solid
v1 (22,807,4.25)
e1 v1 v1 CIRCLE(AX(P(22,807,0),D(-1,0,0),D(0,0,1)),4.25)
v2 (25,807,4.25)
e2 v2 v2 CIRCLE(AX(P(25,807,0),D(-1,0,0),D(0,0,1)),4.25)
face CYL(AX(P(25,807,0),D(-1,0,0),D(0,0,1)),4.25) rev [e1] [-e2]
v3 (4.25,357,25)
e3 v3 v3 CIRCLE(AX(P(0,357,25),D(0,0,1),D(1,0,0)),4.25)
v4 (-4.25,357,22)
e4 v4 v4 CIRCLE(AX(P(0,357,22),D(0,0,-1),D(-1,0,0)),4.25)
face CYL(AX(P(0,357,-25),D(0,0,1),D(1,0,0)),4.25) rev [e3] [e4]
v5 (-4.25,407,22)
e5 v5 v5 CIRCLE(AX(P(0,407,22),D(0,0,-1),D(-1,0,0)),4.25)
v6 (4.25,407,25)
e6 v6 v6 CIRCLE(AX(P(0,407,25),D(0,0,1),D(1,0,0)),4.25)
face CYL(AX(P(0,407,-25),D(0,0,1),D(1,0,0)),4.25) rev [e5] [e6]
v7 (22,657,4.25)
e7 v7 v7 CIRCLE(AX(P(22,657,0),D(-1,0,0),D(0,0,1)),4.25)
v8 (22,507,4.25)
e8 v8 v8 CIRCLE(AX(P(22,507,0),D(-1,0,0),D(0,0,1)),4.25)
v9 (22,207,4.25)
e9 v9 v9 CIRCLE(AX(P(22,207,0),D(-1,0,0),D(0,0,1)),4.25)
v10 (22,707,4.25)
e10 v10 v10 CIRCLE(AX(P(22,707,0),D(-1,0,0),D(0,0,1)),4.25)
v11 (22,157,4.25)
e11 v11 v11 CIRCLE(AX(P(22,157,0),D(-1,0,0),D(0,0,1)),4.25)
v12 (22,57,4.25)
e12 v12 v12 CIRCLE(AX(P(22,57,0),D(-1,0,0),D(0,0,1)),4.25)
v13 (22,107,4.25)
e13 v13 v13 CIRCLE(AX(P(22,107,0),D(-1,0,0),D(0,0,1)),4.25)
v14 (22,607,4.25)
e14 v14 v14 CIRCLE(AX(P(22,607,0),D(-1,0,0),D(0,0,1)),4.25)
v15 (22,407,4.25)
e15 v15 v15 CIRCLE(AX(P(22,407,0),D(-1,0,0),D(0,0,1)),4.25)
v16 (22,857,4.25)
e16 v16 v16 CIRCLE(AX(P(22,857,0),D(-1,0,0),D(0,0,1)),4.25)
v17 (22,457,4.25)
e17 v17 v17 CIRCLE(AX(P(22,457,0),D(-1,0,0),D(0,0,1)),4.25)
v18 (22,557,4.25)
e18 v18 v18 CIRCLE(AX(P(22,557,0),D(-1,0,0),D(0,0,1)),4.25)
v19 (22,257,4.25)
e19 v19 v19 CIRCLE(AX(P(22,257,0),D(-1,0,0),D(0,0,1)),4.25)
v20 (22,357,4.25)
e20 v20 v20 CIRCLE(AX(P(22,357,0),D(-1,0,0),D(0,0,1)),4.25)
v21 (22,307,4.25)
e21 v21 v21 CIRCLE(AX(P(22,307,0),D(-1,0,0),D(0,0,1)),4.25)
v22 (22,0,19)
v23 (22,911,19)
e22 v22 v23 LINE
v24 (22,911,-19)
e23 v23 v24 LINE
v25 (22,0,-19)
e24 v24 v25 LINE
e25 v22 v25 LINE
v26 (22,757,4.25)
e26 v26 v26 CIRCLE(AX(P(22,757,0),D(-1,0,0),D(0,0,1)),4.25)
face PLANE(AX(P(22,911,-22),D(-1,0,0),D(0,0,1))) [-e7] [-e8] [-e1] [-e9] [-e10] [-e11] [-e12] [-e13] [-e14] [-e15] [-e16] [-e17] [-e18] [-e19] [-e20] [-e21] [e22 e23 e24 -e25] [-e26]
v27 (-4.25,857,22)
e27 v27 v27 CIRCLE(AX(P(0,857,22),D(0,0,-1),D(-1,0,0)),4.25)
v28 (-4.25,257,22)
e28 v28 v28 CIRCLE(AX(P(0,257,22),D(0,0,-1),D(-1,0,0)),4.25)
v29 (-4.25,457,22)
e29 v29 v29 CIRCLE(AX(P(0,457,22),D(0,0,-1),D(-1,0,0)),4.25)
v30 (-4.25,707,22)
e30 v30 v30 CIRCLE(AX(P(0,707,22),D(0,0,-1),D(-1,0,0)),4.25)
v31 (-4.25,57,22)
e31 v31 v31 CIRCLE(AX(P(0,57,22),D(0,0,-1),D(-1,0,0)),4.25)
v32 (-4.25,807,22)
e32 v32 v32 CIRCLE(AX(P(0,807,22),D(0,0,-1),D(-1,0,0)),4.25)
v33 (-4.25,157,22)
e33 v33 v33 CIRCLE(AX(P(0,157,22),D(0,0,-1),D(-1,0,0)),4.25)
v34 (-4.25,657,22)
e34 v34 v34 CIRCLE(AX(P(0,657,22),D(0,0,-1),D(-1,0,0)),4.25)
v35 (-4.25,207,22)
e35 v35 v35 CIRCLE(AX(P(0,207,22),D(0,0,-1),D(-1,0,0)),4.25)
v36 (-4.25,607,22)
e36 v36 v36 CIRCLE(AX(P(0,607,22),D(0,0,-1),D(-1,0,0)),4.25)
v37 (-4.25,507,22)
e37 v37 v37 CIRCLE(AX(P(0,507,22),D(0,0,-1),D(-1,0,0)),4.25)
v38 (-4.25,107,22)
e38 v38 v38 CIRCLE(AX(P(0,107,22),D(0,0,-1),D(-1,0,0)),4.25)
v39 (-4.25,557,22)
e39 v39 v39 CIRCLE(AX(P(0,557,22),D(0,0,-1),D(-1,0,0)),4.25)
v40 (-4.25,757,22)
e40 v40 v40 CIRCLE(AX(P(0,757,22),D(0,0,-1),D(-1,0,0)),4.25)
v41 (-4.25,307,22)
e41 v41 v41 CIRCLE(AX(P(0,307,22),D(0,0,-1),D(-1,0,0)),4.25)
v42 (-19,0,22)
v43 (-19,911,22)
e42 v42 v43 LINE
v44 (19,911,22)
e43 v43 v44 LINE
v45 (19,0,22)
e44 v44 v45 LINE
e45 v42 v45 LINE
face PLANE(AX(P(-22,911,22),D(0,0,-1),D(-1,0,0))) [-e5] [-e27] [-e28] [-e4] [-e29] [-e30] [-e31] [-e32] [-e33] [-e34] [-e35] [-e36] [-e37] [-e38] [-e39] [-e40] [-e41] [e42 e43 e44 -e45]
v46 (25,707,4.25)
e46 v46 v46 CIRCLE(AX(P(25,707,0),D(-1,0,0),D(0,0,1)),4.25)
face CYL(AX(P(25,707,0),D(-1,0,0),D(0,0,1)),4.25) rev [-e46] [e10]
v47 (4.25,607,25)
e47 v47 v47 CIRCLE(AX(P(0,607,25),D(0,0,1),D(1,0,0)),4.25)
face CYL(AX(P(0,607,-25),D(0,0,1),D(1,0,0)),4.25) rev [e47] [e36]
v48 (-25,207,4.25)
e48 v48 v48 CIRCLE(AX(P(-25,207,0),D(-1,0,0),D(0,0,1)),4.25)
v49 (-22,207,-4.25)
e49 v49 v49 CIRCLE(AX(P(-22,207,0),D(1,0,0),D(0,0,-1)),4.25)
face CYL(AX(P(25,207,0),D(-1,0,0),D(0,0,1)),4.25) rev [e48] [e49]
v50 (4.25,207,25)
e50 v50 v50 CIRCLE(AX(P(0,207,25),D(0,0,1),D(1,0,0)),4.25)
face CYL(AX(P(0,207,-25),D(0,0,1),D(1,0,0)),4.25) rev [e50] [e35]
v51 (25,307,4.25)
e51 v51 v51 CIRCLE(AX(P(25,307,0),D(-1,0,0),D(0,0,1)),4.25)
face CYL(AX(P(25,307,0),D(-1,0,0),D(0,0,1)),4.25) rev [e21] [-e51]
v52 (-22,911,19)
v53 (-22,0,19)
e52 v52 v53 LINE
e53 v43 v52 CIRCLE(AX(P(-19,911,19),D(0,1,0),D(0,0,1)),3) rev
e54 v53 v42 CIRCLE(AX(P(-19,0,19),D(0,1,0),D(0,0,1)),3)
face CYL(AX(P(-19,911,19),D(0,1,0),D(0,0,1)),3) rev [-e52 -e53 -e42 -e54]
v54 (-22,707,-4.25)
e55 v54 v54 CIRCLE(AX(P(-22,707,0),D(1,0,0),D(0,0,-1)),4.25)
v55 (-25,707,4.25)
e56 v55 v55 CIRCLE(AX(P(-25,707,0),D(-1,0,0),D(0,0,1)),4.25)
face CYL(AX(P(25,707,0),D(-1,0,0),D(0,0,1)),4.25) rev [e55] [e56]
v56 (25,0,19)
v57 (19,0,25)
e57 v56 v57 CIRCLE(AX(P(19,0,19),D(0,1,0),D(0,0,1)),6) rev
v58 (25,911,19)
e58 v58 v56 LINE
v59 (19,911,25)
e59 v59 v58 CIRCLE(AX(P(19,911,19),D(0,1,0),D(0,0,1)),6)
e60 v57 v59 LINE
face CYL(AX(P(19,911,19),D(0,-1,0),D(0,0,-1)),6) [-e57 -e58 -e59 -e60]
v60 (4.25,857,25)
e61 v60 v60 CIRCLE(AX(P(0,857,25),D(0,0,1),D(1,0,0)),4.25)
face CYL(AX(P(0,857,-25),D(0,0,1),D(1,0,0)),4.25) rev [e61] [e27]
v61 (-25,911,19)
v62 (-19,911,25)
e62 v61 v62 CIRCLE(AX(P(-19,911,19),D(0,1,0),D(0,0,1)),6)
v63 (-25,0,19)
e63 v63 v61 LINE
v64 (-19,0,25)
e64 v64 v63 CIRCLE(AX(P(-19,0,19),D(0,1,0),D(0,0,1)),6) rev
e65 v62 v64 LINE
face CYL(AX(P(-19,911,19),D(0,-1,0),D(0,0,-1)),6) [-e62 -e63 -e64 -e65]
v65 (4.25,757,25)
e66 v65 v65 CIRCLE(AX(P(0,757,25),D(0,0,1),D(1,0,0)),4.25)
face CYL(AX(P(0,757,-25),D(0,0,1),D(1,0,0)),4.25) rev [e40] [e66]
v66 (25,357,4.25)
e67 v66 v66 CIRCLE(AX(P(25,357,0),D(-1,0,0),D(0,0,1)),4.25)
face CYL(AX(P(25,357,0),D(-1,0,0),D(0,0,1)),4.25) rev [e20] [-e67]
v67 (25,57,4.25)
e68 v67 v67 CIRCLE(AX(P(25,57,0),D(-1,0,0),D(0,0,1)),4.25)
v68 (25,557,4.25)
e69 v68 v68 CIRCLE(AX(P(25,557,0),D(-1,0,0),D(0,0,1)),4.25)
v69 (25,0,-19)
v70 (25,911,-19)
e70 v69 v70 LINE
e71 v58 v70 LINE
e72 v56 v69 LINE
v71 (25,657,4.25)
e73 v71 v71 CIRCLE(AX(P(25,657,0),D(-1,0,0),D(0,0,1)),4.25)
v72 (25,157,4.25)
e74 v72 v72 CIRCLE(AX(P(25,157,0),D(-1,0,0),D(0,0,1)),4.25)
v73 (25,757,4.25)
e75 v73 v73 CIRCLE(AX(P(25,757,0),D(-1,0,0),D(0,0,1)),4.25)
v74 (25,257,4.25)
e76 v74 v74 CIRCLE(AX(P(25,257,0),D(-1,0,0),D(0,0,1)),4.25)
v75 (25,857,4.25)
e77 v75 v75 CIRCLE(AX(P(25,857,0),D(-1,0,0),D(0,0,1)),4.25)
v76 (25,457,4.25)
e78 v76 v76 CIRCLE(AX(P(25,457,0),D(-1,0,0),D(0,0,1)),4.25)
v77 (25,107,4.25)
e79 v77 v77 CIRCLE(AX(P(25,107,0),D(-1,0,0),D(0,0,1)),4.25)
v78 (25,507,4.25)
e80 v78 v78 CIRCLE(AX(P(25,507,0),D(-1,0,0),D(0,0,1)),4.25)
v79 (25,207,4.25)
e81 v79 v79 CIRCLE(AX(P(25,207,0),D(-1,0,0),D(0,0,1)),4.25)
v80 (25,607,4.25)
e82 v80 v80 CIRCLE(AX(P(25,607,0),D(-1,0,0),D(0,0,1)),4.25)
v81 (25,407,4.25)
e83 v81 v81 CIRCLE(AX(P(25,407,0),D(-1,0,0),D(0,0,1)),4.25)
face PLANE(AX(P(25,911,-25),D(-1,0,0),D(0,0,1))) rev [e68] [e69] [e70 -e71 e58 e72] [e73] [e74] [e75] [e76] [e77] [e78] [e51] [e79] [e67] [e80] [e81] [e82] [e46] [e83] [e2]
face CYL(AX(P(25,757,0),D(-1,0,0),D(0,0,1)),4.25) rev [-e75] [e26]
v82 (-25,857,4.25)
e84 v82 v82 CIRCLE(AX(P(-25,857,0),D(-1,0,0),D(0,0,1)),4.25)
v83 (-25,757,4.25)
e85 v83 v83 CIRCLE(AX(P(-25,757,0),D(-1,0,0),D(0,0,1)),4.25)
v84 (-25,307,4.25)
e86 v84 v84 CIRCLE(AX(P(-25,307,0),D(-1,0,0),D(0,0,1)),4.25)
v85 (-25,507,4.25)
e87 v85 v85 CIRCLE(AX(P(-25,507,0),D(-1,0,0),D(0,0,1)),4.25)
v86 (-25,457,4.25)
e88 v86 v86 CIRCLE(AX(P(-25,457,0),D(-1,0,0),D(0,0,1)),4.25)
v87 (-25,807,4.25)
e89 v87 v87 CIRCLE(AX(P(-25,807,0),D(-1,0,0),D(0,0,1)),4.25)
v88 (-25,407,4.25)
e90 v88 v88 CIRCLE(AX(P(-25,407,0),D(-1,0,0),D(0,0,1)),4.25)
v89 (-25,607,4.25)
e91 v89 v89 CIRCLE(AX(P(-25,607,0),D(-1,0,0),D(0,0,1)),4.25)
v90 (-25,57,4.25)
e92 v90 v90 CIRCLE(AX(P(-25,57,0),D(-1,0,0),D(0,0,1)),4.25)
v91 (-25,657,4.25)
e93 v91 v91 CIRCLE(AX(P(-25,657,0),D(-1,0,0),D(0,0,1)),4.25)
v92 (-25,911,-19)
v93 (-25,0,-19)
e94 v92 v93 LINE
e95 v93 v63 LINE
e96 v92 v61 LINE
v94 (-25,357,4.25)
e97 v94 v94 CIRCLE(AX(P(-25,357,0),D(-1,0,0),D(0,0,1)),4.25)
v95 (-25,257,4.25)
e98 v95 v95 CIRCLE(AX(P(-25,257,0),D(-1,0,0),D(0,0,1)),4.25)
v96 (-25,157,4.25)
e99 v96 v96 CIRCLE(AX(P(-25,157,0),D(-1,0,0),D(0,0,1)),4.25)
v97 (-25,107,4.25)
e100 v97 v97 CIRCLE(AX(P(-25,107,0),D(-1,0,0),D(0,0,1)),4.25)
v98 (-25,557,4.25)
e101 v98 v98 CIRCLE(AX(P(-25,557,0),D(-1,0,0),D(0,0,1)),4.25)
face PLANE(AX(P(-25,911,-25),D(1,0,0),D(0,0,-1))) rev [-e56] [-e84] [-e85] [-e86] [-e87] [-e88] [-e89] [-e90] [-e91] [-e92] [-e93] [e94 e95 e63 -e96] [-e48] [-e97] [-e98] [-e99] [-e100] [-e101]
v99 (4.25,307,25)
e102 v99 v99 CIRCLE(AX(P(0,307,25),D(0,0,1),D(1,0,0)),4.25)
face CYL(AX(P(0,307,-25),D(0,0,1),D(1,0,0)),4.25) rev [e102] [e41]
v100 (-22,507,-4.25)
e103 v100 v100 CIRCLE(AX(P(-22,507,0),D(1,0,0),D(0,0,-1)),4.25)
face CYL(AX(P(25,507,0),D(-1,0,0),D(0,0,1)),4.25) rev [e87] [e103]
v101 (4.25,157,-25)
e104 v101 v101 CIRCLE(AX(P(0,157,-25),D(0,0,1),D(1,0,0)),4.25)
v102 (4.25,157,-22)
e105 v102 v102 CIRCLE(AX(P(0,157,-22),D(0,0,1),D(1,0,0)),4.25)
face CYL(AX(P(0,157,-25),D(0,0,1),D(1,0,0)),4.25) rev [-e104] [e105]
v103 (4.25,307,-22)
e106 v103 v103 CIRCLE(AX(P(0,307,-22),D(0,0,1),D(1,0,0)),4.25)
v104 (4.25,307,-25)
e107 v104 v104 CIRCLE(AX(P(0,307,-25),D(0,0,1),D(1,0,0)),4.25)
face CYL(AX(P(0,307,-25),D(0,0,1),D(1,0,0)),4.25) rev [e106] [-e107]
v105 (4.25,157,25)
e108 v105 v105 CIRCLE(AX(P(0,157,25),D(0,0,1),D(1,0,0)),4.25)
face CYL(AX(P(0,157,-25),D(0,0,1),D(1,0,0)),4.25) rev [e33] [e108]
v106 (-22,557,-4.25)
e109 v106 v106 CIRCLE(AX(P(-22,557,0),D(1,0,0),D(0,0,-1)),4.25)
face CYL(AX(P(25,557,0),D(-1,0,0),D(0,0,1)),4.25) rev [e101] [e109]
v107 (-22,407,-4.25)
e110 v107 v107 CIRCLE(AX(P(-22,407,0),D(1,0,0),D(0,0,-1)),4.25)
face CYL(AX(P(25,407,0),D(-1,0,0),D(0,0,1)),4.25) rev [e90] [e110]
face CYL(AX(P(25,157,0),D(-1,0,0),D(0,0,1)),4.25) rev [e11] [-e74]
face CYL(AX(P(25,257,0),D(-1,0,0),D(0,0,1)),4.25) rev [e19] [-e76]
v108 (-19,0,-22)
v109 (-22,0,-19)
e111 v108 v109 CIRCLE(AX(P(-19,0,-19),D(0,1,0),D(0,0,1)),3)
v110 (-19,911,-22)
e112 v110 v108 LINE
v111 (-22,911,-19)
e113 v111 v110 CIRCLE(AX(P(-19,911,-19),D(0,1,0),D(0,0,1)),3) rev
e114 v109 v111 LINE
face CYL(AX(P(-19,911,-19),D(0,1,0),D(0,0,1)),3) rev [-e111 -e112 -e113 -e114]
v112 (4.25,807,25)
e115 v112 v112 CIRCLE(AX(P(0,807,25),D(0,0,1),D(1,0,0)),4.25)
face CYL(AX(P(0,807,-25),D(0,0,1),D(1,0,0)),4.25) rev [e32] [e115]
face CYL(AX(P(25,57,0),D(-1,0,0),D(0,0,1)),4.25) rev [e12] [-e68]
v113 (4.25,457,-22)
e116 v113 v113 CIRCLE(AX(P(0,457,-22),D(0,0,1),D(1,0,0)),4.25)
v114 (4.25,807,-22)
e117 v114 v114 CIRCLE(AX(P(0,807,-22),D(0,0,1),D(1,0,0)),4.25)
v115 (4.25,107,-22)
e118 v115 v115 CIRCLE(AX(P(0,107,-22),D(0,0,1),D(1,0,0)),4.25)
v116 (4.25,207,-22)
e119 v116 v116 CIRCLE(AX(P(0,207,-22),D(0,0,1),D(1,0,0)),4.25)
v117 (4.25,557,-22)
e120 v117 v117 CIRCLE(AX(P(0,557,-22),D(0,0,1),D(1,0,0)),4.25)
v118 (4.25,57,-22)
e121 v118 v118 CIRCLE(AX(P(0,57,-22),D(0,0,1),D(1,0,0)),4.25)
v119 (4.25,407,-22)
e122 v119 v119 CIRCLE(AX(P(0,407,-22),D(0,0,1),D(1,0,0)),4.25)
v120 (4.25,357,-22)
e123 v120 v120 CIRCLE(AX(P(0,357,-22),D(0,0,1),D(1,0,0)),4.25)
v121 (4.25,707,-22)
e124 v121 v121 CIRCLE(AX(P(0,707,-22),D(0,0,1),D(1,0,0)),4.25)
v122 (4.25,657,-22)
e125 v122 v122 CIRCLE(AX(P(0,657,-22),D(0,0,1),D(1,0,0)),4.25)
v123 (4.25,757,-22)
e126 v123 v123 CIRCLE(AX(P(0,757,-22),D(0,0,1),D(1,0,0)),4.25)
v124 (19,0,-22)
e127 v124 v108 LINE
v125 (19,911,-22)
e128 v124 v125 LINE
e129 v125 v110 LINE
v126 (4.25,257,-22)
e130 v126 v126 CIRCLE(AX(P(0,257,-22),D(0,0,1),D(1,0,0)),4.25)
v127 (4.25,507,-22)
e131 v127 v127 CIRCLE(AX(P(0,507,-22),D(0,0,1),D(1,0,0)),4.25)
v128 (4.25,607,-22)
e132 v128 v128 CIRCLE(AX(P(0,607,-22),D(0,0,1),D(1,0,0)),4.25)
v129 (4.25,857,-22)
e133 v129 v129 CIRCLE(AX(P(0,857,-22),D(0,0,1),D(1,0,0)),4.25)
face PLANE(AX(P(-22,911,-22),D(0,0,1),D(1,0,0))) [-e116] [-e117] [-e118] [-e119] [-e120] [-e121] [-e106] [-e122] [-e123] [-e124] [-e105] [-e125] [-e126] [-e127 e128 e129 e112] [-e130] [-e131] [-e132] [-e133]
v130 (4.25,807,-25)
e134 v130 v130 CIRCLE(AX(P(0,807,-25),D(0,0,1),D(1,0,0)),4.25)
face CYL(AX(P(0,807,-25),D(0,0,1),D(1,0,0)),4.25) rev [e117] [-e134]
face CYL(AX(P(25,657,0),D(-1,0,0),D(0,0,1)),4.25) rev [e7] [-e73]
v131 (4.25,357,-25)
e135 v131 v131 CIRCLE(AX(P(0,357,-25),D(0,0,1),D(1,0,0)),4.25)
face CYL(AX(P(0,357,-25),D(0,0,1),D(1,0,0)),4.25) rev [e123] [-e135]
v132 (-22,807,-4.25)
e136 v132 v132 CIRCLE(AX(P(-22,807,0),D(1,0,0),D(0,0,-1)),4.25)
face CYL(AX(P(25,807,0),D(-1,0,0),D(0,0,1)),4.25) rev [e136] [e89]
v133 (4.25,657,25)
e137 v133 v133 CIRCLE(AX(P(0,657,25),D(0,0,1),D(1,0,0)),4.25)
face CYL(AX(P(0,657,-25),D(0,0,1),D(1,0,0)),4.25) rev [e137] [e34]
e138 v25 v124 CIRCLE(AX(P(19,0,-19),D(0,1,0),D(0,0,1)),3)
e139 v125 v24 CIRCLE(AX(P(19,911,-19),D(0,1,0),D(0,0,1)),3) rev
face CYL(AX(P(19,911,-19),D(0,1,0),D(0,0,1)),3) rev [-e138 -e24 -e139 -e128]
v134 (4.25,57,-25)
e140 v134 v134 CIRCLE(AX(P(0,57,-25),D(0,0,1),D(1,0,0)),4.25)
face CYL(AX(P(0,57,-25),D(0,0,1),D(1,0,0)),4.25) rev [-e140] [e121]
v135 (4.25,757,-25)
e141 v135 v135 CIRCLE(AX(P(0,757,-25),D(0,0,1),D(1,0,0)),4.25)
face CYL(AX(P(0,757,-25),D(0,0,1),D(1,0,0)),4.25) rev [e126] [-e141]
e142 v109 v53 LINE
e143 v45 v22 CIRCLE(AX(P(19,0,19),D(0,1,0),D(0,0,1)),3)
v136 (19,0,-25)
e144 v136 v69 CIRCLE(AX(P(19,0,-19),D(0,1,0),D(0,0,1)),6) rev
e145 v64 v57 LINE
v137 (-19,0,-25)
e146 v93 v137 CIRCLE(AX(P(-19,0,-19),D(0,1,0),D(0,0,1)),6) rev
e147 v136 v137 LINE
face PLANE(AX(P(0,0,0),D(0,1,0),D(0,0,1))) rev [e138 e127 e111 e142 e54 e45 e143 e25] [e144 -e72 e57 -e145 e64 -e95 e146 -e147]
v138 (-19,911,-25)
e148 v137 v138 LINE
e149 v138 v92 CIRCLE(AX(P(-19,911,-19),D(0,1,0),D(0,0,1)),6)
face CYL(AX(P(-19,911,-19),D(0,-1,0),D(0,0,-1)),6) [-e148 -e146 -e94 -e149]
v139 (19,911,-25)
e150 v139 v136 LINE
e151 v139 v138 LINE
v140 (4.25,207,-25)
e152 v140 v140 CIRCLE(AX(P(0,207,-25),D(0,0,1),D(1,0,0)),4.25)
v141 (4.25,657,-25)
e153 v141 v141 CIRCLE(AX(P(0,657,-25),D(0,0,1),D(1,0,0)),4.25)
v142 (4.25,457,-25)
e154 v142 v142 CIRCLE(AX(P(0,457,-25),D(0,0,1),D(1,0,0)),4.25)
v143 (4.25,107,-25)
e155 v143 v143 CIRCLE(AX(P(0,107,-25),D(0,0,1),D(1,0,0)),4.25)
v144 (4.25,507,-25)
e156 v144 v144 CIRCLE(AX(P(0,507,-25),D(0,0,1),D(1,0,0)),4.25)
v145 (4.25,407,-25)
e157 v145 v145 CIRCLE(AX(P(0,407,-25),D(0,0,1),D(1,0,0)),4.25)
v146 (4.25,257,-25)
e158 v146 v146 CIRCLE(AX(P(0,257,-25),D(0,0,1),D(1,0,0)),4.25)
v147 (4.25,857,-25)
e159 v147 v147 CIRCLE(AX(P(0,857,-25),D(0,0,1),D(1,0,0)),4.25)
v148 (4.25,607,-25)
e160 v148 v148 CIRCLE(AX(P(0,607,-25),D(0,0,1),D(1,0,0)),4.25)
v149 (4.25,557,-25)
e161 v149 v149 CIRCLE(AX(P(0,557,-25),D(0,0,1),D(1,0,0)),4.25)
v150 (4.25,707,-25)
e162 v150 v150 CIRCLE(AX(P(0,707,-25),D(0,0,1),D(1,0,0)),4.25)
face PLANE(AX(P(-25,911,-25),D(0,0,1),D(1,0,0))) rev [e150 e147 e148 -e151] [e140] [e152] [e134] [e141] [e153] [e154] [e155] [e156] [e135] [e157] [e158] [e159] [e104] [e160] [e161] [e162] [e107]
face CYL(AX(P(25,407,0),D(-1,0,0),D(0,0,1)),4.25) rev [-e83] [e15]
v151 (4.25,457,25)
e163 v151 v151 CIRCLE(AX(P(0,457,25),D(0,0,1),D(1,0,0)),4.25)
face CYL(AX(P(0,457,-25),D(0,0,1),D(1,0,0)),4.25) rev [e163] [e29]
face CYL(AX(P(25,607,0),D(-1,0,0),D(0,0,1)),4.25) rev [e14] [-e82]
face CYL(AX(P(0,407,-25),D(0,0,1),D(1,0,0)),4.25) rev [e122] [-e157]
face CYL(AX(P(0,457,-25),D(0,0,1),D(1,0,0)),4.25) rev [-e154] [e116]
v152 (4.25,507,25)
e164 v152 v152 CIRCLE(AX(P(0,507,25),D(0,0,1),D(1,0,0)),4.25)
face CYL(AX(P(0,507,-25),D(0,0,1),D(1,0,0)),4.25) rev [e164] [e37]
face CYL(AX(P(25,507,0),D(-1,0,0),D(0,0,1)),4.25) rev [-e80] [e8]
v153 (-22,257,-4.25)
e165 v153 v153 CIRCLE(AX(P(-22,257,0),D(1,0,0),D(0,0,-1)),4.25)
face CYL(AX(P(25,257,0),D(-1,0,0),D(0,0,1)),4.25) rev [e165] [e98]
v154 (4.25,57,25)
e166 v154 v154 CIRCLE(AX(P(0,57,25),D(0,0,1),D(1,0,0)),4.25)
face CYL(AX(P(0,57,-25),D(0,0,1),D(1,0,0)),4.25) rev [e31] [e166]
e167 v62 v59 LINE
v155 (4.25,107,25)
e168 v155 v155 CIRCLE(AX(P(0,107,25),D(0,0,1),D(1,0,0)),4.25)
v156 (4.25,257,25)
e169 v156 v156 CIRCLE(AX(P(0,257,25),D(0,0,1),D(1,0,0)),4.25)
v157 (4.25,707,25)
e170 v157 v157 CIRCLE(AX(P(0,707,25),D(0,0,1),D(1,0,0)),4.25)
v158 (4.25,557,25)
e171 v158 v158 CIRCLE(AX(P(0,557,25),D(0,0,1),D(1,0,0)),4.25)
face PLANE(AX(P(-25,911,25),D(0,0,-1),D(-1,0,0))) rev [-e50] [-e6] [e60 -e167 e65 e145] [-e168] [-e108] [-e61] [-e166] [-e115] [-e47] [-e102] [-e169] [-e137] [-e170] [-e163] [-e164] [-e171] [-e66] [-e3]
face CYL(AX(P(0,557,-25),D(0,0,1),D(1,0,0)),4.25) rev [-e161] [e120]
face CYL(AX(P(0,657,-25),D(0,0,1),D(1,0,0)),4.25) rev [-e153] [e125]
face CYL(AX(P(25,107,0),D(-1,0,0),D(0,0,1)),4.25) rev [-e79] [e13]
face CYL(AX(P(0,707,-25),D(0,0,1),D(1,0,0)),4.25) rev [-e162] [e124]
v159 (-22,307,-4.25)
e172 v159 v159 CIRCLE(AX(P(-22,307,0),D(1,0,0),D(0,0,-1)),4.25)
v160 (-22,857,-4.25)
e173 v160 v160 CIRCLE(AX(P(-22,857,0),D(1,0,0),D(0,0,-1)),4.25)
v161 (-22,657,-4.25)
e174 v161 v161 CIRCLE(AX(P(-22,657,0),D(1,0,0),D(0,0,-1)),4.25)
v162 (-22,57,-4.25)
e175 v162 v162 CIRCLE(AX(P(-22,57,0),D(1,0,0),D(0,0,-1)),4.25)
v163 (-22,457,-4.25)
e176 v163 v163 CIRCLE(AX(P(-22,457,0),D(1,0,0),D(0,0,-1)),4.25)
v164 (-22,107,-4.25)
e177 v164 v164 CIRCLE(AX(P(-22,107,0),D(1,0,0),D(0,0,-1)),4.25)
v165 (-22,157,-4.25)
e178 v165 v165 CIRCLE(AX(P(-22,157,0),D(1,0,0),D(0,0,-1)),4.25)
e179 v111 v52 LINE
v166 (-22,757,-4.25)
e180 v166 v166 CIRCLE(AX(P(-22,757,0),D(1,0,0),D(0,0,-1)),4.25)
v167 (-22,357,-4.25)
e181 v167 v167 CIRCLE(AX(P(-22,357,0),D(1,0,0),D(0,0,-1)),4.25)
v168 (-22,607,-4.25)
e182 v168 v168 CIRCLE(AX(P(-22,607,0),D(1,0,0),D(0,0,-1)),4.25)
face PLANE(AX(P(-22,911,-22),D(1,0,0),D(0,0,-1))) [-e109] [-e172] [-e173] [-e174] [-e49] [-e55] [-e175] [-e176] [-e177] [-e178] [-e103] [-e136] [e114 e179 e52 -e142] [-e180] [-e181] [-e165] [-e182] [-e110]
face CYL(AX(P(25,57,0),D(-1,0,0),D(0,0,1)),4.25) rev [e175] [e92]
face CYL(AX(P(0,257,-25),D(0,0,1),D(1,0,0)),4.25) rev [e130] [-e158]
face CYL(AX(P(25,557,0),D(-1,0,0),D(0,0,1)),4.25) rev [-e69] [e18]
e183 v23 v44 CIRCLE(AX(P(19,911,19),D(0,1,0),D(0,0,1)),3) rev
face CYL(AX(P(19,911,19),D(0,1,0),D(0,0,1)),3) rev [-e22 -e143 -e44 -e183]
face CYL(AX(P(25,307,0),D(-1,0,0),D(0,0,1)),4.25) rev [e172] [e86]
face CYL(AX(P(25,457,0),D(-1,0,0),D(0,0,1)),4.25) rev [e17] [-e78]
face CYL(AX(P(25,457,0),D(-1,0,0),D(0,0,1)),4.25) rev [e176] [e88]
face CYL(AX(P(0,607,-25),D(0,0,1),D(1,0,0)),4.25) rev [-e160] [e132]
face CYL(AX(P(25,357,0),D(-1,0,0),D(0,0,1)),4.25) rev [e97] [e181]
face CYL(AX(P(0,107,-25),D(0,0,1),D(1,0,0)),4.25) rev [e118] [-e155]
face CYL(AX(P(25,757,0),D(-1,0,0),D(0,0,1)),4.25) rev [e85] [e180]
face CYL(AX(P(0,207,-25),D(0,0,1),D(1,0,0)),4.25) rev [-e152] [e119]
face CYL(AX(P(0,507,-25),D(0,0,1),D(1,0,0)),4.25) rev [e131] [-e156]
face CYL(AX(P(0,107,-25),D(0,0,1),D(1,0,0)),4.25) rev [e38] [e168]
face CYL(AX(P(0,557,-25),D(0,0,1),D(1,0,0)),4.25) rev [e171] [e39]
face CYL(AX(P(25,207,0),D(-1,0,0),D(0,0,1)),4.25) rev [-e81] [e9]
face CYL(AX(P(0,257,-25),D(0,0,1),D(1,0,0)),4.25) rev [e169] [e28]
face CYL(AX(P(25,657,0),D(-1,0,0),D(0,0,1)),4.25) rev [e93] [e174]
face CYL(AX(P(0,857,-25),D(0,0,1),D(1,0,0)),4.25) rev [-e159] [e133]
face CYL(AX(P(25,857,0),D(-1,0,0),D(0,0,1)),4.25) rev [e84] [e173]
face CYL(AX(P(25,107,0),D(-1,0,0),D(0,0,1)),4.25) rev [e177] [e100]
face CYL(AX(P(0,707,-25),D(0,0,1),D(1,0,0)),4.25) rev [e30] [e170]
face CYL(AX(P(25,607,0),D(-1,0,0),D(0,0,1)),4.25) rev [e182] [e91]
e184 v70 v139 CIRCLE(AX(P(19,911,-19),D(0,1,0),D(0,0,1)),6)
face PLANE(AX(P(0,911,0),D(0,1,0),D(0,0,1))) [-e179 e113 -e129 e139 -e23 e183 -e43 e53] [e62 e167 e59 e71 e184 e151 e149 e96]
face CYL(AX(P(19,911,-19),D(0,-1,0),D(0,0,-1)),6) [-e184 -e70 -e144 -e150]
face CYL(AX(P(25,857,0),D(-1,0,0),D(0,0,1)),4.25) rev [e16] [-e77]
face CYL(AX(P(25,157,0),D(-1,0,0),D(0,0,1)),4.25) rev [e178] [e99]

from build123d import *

# Parameters (mm, degrees)
ESQUISSE1_W                             = 50
ESQUISSE1_H                             = 50
ESQUISSE1_W_2                           = 44
ESQUISSE1_H_2                           = 44
BOSS_EXTRU_1_DEPTH                      = 911
PER_AGE2_START                          = -25
PER_AGE2_OUTLINE_R                      = 4.25
PER_AGE2_DEPTH                          = 50
R_P_TITION_LIN_AIRE1_COUNT              = 17
R_P_TITION_LIN_AIRE1_PITCH              = 50
R_P_TITION_CIRCULAIRE1_COUNT            = 2
R_P_TITION_CIRCULAIRE1_ANGLE            = 90
R_P_TITION_START                        = -25
R_P_TITION_CIRCULAIRE1_COPY_1_SKETCH_R  = 4.25
R_P_TITION_CIRCULAIRE1_COPY_1_DEPTH     = 50
R_P_TITION_CIRCULAIRE1_COPY_2_SKETCH_R  = 4.25
R_P_TITION_CIRCULAIRE1_COPY_2_DEPTH     = 50
R_P_TITION_CIRCULAIRE1_COPY_3_SKETCH_R  = 4.25
R_P_TITION_CIRCULAIRE1_COPY_3_DEPTH     = 50
R_P_TITION_CIRCULAIRE1_COPY_4_SKETCH_R  = 4.25
R_P_TITION_CIRCULAIRE1_COPY_4_DEPTH     = 50
R_P_TITION_CIRCULAIRE1_COPY_5_SKETCH_R  = 4.25
R_P_TITION_CIRCULAIRE1_COPY_5_DEPTH     = 50
R_P_TITION_CIRCULAIRE1_COPY_6_SKETCH_R  = 4.25
R_P_TITION_CIRCULAIRE1_COPY_6_DEPTH     = 50
R_P_TITION_CIRCULAIRE1_COPY_7_SKETCH_R  = 4.25
R_P_TITION_CIRCULAIRE1_COPY_7_DEPTH     = 50
R_P_TITION_CIRCULAIRE1_COPY_8_SKETCH_R  = 4.25
R_P_TITION_CIRCULAIRE1_COPY_8_DEPTH     = 50
R_P_TITION_CIRCULAIRE1_COPY_9_SKETCH_R  = 4.25
R_P_TITION_CIRCULAIRE1_COPY_9_DEPTH     = 50
R_P_TITION_CIRCULAIRE1_COPY_10_SKETCH_R = 4.25
R_P_TITION_CIRCULAIRE1_COPY_10_DEPTH    = 50
R_P_TITION_CIRCULAIRE1_COPY_11_SKETCH_R = 4.25
R_P_TITION_CIRCULAIRE1_COPY_11_DEPTH    = 50
R_P_TITION_CIRCULAIRE1_COPY_12_SKETCH_R = 4.25
R_P_TITION_CIRCULAIRE1_COPY_12_DEPTH    = 50
R_P_TITION_CIRCULAIRE1_COPY_13_SKETCH_R = 4.25
R_P_TITION_CIRCULAIRE1_COPY_13_DEPTH    = 50
R_P_TITION_CIRCULAIRE1_COPY_14_SKETCH_R = 4.25
R_P_TITION_CIRCULAIRE1_COPY_14_DEPTH    = 50
R_P_TITION_CIRCULAIRE1_COPY_15_SKETCH_R = 4.25
R_P_TITION_CIRCULAIRE1_COPY_15_DEPTH    = 50
R_P_TITION_CIRCULAIRE1_COPY_16_SKETCH_R = 4.25
R_P_TITION_CIRCULAIRE1_COPY_16_DEPTH    = 50
CONG_3_R                                = 6
CONG_4_R                                = 3


# Read off the part's stored shape, not the designer's step: Perçage2
with BuildPart() as part:
    # Esquisse1 → Boss.-Extru.1 (new body)
    with BuildSketch(Plane(origin=(0, 0, 0), x_dir=(1, 0, 0), z_dir=(0, 1, 0))):
        Rectangle(ESQUISSE1_W, ESQUISSE1_H)
        Rectangle(ESQUISSE1_W_2, ESQUISSE1_H_2, mode=Mode.SUBTRACT)
    extrude(amount=BOSS_EXTRU_1_DEPTH)

    # Perçage2 outline → Perçage2 (cut)
    with BuildSketch(Plane.XY.offset(PER_AGE2_START)):
        with Locations((0, 57)):
            Circle(PER_AGE2_OUTLINE_R)
    per_age2 = extrude(amount=PER_AGE2_DEPTH, mode=Mode.SUBTRACT)

    # Répétition linéaire1: Perçage2 ×17
    with Locations(*[(0, i * R_P_TITION_LIN_AIRE1_PITCH, 0) for i in range(1, R_P_TITION_LIN_AIRE1_COUNT)]):
        add(per_age2, mode=Mode.SUBTRACT)

    # Répétition circulaire1: Perçage2 ×2 about axis
    r_p_tition_circulaire1_axis = Axis((0, 55, 0), (0, -1, 0))
    for i in range(1, R_P_TITION_CIRCULAIRE1_COUNT):
        add(per_age2.rotate(r_p_tition_circulaire1_axis, i * R_P_TITION_CIRCULAIRE1_ANGLE / (R_P_TITION_CIRCULAIRE1_COUNT - 1)), mode=Mode.SUBTRACT)

    # Répétition circulaire1 copy 1 sketch → Répétition circulaire1 copy 1 (cut)
    with BuildSketch(Plane(origin=(0, 50, 0), x_dir=(0, 0, 1), z_dir=(-1, 0, 0)).offset(R_P_TITION_START)):
        with Locations((0, 57)):
            Circle(R_P_TITION_CIRCULAIRE1_COPY_1_SKETCH_R)
    extrude(amount=R_P_TITION_CIRCULAIRE1_COPY_1_DEPTH, mode=Mode.SUBTRACT)

    # Répétition circulaire1 copy 2 sketch → Répétition circulaire1 copy 2 (cut)
    with BuildSketch(Plane(origin=(0, 100, 0), x_dir=(0, 0, 1), z_dir=(-1, 0, 0)).offset(R_P_TITION_START)):
        with Locations((0, 57)):
            Circle(R_P_TITION_CIRCULAIRE1_COPY_2_SKETCH_R)
    extrude(amount=R_P_TITION_CIRCULAIRE1_COPY_2_DEPTH, mode=Mode.SUBTRACT)

    # Répétition circulaire1 copy 3 sketch → Répétition circulaire1 copy 3 (cut)
    with BuildSketch(Plane(origin=(0, 150, 0), x_dir=(0, 0, 1), z_dir=(-1, 0, 0)).offset(R_P_TITION_START)):
        with Locations((0, 57)):
            Circle(R_P_TITION_CIRCULAIRE1_COPY_3_SKETCH_R)
    extrude(amount=R_P_TITION_CIRCULAIRE1_COPY_3_DEPTH, mode=Mode.SUBTRACT)

    # Répétition circulaire1 copy 4 sketch → Répétition circulaire1 copy 4 (cut)
    with BuildSketch(Plane(origin=(0, 200, 0), x_dir=(0, 0, 1), z_dir=(-1, 0, 0)).offset(R_P_TITION_START)):
        with Locations((0, 57)):
            Circle(R_P_TITION_CIRCULAIRE1_COPY_4_SKETCH_R)
    extrude(amount=R_P_TITION_CIRCULAIRE1_COPY_4_DEPTH, mode=Mode.SUBTRACT)

    # Répétition circulaire1 copy 5 sketch → Répétition circulaire1 copy 5 (cut)
    with BuildSketch(Plane(origin=(0, 250, 0), x_dir=(0, 0, 1), z_dir=(-1, 0, 0)).offset(R_P_TITION_START)):
        with Locations((0, 57)):
            Circle(R_P_TITION_CIRCULAIRE1_COPY_5_SKETCH_R)
    extrude(amount=R_P_TITION_CIRCULAIRE1_COPY_5_DEPTH, mode=Mode.SUBTRACT)

    # Répétition circulaire1 copy 6 sketch → Répétition circulaire1 copy 6 (cut)
    with BuildSketch(Plane(origin=(0, 300, 0), x_dir=(0, 0, 1), z_dir=(-1, 0, 0)).offset(R_P_TITION_START)):
        with Locations((0, 57)):
            Circle(R_P_TITION_CIRCULAIRE1_COPY_6_SKETCH_R)
    extrude(amount=R_P_TITION_CIRCULAIRE1_COPY_6_DEPTH, mode=Mode.SUBTRACT)

    # Répétition circulaire1 copy 7 sketch → Répétition circulaire1 copy 7 (cut)
    with BuildSketch(Plane(origin=(0, 350, 0), x_dir=(0, 0, 1), z_dir=(-1, 0, 0)).offset(R_P_TITION_START)):
        with Locations((0, 57)):
            Circle(R_P_TITION_CIRCULAIRE1_COPY_7_SKETCH_R)
    extrude(amount=R_P_TITION_CIRCULAIRE1_COPY_7_DEPTH, mode=Mode.SUBTRACT)

    # Répétition circulaire1 copy 8 sketch → Répétition circulaire1 copy 8 (cut)
    with BuildSketch(Plane(origin=(0, 400, 0), x_dir=(0, 0, 1), z_dir=(-1, 0, 0)).offset(R_P_TITION_START)):
        with Locations((0, 57)):
            Circle(R_P_TITION_CIRCULAIRE1_COPY_8_SKETCH_R)
    extrude(amount=R_P_TITION_CIRCULAIRE1_COPY_8_DEPTH, mode=Mode.SUBTRACT)

    # Répétition circulaire1 copy 9 sketch → Répétition circulaire1 copy 9 (cut)
    with BuildSketch(Plane(origin=(0, 450, 0), x_dir=(0, 0, 1), z_dir=(-1, 0, 0)).offset(R_P_TITION_START)):
        with Locations((0, 57)):
            Circle(R_P_TITION_CIRCULAIRE1_COPY_9_SKETCH_R)
    extrude(amount=R_P_TITION_CIRCULAIRE1_COPY_9_DEPTH, mode=Mode.SUBTRACT)

    # Répétition circulaire1 copy 10 sketch → Répétition circulaire1 copy 10 (cut)
    with BuildSketch(Plane(origin=(0, 500, 0), x_dir=(0, 0, 1), z_dir=(-1, 0, 0)).offset(R_P_TITION_START)):
        with Locations((0, 57)):
            Circle(R_P_TITION_CIRCULAIRE1_COPY_10_SKETCH_R)
    extrude(amount=R_P_TITION_CIRCULAIRE1_COPY_10_DEPTH, mode=Mode.SUBTRACT)

    # Répétition circulaire1 copy 11 sketch → Répétition circulaire1 copy 11 (cut)
    with BuildSketch(Plane(origin=(0, 550, 0), x_dir=(0, 0, 1), z_dir=(-1, 0, 0)).offset(R_P_TITION_START)):
        with Locations((0, 57)):
            Circle(R_P_TITION_CIRCULAIRE1_COPY_11_SKETCH_R)
    extrude(amount=R_P_TITION_CIRCULAIRE1_COPY_11_DEPTH, mode=Mode.SUBTRACT)

    # Répétition circulaire1 copy 12 sketch → Répétition circulaire1 copy 12 (cut)
    with BuildSketch(Plane(origin=(0, 600, 0), x_dir=(0, 0, 1), z_dir=(-1, 0, 0)).offset(R_P_TITION_START)):
        with Locations((0, 57)):
            Circle(R_P_TITION_CIRCULAIRE1_COPY_12_SKETCH_R)
    extrude(amount=R_P_TITION_CIRCULAIRE1_COPY_12_DEPTH, mode=Mode.SUBTRACT)

    # Répétition circulaire1 copy 13 sketch → Répétition circulaire1 copy 13 (cut)
    with BuildSketch(Plane(origin=(0, 650, 0), x_dir=(0, 0, 1), z_dir=(-1, 0, 0)).offset(R_P_TITION_START)):
        with Locations((0, 57)):
            Circle(R_P_TITION_CIRCULAIRE1_COPY_13_SKETCH_R)
    extrude(amount=R_P_TITION_CIRCULAIRE1_COPY_13_DEPTH, mode=Mode.SUBTRACT)

    # Répétition circulaire1 copy 14 sketch → Répétition circulaire1 copy 14 (cut)
    with BuildSketch(Plane(origin=(0, 700, 0), x_dir=(0, 0, 1), z_dir=(-1, 0, 0)).offset(R_P_TITION_START)):
        with Locations((0, 57)):
            Circle(R_P_TITION_CIRCULAIRE1_COPY_14_SKETCH_R)
    extrude(amount=R_P_TITION_CIRCULAIRE1_COPY_14_DEPTH, mode=Mode.SUBTRACT)

    # Répétition circulaire1 copy 15 sketch → Répétition circulaire1 copy 15 (cut)
    with BuildSketch(Plane(origin=(0, 750, 0), x_dir=(0, 0, 1), z_dir=(-1, 0, 0)).offset(R_P_TITION_START)):
        with Locations((0, 57)):
            Circle(R_P_TITION_CIRCULAIRE1_COPY_15_SKETCH_R)
    extrude(amount=R_P_TITION_CIRCULAIRE1_COPY_15_DEPTH, mode=Mode.SUBTRACT)

    # Répétition circulaire1 copy 16 sketch → Répétition circulaire1 copy 16 (cut)
    with BuildSketch(Plane(origin=(0, 800, 0), x_dir=(0, 0, 1), z_dir=(-1, 0, 0)).offset(R_P_TITION_START)):
        with Locations((0, 57)):
            Circle(R_P_TITION_CIRCULAIRE1_COPY_16_SKETCH_R)
    extrude(amount=R_P_TITION_CIRCULAIRE1_COPY_16_DEPTH, mode=Mode.SUBTRACT)

    # Congé3
    cong_3_edges = [part.edges().sort_by_distance(p)[0] for p in [
        (-25, 455.5, -25),
        (25, 455.5, -25),
        (25, 455.5, 25),
        (-25, 455.5, 25),
    ]]
    fillet(cong_3_edges, radius=CONG_3_R)

    # Congé4
    cong_4_edges = [part.edges().sort_by_distance(p)[0] for p in [
        (22, 455.5, -22),
        (-22, 455.5, -22),
        (-22, 455.5, 22),
        (22, 455.5, 22),
    ]]
    fillet(cong_4_edges, radius=CONG_4_R)


solid = part.part
